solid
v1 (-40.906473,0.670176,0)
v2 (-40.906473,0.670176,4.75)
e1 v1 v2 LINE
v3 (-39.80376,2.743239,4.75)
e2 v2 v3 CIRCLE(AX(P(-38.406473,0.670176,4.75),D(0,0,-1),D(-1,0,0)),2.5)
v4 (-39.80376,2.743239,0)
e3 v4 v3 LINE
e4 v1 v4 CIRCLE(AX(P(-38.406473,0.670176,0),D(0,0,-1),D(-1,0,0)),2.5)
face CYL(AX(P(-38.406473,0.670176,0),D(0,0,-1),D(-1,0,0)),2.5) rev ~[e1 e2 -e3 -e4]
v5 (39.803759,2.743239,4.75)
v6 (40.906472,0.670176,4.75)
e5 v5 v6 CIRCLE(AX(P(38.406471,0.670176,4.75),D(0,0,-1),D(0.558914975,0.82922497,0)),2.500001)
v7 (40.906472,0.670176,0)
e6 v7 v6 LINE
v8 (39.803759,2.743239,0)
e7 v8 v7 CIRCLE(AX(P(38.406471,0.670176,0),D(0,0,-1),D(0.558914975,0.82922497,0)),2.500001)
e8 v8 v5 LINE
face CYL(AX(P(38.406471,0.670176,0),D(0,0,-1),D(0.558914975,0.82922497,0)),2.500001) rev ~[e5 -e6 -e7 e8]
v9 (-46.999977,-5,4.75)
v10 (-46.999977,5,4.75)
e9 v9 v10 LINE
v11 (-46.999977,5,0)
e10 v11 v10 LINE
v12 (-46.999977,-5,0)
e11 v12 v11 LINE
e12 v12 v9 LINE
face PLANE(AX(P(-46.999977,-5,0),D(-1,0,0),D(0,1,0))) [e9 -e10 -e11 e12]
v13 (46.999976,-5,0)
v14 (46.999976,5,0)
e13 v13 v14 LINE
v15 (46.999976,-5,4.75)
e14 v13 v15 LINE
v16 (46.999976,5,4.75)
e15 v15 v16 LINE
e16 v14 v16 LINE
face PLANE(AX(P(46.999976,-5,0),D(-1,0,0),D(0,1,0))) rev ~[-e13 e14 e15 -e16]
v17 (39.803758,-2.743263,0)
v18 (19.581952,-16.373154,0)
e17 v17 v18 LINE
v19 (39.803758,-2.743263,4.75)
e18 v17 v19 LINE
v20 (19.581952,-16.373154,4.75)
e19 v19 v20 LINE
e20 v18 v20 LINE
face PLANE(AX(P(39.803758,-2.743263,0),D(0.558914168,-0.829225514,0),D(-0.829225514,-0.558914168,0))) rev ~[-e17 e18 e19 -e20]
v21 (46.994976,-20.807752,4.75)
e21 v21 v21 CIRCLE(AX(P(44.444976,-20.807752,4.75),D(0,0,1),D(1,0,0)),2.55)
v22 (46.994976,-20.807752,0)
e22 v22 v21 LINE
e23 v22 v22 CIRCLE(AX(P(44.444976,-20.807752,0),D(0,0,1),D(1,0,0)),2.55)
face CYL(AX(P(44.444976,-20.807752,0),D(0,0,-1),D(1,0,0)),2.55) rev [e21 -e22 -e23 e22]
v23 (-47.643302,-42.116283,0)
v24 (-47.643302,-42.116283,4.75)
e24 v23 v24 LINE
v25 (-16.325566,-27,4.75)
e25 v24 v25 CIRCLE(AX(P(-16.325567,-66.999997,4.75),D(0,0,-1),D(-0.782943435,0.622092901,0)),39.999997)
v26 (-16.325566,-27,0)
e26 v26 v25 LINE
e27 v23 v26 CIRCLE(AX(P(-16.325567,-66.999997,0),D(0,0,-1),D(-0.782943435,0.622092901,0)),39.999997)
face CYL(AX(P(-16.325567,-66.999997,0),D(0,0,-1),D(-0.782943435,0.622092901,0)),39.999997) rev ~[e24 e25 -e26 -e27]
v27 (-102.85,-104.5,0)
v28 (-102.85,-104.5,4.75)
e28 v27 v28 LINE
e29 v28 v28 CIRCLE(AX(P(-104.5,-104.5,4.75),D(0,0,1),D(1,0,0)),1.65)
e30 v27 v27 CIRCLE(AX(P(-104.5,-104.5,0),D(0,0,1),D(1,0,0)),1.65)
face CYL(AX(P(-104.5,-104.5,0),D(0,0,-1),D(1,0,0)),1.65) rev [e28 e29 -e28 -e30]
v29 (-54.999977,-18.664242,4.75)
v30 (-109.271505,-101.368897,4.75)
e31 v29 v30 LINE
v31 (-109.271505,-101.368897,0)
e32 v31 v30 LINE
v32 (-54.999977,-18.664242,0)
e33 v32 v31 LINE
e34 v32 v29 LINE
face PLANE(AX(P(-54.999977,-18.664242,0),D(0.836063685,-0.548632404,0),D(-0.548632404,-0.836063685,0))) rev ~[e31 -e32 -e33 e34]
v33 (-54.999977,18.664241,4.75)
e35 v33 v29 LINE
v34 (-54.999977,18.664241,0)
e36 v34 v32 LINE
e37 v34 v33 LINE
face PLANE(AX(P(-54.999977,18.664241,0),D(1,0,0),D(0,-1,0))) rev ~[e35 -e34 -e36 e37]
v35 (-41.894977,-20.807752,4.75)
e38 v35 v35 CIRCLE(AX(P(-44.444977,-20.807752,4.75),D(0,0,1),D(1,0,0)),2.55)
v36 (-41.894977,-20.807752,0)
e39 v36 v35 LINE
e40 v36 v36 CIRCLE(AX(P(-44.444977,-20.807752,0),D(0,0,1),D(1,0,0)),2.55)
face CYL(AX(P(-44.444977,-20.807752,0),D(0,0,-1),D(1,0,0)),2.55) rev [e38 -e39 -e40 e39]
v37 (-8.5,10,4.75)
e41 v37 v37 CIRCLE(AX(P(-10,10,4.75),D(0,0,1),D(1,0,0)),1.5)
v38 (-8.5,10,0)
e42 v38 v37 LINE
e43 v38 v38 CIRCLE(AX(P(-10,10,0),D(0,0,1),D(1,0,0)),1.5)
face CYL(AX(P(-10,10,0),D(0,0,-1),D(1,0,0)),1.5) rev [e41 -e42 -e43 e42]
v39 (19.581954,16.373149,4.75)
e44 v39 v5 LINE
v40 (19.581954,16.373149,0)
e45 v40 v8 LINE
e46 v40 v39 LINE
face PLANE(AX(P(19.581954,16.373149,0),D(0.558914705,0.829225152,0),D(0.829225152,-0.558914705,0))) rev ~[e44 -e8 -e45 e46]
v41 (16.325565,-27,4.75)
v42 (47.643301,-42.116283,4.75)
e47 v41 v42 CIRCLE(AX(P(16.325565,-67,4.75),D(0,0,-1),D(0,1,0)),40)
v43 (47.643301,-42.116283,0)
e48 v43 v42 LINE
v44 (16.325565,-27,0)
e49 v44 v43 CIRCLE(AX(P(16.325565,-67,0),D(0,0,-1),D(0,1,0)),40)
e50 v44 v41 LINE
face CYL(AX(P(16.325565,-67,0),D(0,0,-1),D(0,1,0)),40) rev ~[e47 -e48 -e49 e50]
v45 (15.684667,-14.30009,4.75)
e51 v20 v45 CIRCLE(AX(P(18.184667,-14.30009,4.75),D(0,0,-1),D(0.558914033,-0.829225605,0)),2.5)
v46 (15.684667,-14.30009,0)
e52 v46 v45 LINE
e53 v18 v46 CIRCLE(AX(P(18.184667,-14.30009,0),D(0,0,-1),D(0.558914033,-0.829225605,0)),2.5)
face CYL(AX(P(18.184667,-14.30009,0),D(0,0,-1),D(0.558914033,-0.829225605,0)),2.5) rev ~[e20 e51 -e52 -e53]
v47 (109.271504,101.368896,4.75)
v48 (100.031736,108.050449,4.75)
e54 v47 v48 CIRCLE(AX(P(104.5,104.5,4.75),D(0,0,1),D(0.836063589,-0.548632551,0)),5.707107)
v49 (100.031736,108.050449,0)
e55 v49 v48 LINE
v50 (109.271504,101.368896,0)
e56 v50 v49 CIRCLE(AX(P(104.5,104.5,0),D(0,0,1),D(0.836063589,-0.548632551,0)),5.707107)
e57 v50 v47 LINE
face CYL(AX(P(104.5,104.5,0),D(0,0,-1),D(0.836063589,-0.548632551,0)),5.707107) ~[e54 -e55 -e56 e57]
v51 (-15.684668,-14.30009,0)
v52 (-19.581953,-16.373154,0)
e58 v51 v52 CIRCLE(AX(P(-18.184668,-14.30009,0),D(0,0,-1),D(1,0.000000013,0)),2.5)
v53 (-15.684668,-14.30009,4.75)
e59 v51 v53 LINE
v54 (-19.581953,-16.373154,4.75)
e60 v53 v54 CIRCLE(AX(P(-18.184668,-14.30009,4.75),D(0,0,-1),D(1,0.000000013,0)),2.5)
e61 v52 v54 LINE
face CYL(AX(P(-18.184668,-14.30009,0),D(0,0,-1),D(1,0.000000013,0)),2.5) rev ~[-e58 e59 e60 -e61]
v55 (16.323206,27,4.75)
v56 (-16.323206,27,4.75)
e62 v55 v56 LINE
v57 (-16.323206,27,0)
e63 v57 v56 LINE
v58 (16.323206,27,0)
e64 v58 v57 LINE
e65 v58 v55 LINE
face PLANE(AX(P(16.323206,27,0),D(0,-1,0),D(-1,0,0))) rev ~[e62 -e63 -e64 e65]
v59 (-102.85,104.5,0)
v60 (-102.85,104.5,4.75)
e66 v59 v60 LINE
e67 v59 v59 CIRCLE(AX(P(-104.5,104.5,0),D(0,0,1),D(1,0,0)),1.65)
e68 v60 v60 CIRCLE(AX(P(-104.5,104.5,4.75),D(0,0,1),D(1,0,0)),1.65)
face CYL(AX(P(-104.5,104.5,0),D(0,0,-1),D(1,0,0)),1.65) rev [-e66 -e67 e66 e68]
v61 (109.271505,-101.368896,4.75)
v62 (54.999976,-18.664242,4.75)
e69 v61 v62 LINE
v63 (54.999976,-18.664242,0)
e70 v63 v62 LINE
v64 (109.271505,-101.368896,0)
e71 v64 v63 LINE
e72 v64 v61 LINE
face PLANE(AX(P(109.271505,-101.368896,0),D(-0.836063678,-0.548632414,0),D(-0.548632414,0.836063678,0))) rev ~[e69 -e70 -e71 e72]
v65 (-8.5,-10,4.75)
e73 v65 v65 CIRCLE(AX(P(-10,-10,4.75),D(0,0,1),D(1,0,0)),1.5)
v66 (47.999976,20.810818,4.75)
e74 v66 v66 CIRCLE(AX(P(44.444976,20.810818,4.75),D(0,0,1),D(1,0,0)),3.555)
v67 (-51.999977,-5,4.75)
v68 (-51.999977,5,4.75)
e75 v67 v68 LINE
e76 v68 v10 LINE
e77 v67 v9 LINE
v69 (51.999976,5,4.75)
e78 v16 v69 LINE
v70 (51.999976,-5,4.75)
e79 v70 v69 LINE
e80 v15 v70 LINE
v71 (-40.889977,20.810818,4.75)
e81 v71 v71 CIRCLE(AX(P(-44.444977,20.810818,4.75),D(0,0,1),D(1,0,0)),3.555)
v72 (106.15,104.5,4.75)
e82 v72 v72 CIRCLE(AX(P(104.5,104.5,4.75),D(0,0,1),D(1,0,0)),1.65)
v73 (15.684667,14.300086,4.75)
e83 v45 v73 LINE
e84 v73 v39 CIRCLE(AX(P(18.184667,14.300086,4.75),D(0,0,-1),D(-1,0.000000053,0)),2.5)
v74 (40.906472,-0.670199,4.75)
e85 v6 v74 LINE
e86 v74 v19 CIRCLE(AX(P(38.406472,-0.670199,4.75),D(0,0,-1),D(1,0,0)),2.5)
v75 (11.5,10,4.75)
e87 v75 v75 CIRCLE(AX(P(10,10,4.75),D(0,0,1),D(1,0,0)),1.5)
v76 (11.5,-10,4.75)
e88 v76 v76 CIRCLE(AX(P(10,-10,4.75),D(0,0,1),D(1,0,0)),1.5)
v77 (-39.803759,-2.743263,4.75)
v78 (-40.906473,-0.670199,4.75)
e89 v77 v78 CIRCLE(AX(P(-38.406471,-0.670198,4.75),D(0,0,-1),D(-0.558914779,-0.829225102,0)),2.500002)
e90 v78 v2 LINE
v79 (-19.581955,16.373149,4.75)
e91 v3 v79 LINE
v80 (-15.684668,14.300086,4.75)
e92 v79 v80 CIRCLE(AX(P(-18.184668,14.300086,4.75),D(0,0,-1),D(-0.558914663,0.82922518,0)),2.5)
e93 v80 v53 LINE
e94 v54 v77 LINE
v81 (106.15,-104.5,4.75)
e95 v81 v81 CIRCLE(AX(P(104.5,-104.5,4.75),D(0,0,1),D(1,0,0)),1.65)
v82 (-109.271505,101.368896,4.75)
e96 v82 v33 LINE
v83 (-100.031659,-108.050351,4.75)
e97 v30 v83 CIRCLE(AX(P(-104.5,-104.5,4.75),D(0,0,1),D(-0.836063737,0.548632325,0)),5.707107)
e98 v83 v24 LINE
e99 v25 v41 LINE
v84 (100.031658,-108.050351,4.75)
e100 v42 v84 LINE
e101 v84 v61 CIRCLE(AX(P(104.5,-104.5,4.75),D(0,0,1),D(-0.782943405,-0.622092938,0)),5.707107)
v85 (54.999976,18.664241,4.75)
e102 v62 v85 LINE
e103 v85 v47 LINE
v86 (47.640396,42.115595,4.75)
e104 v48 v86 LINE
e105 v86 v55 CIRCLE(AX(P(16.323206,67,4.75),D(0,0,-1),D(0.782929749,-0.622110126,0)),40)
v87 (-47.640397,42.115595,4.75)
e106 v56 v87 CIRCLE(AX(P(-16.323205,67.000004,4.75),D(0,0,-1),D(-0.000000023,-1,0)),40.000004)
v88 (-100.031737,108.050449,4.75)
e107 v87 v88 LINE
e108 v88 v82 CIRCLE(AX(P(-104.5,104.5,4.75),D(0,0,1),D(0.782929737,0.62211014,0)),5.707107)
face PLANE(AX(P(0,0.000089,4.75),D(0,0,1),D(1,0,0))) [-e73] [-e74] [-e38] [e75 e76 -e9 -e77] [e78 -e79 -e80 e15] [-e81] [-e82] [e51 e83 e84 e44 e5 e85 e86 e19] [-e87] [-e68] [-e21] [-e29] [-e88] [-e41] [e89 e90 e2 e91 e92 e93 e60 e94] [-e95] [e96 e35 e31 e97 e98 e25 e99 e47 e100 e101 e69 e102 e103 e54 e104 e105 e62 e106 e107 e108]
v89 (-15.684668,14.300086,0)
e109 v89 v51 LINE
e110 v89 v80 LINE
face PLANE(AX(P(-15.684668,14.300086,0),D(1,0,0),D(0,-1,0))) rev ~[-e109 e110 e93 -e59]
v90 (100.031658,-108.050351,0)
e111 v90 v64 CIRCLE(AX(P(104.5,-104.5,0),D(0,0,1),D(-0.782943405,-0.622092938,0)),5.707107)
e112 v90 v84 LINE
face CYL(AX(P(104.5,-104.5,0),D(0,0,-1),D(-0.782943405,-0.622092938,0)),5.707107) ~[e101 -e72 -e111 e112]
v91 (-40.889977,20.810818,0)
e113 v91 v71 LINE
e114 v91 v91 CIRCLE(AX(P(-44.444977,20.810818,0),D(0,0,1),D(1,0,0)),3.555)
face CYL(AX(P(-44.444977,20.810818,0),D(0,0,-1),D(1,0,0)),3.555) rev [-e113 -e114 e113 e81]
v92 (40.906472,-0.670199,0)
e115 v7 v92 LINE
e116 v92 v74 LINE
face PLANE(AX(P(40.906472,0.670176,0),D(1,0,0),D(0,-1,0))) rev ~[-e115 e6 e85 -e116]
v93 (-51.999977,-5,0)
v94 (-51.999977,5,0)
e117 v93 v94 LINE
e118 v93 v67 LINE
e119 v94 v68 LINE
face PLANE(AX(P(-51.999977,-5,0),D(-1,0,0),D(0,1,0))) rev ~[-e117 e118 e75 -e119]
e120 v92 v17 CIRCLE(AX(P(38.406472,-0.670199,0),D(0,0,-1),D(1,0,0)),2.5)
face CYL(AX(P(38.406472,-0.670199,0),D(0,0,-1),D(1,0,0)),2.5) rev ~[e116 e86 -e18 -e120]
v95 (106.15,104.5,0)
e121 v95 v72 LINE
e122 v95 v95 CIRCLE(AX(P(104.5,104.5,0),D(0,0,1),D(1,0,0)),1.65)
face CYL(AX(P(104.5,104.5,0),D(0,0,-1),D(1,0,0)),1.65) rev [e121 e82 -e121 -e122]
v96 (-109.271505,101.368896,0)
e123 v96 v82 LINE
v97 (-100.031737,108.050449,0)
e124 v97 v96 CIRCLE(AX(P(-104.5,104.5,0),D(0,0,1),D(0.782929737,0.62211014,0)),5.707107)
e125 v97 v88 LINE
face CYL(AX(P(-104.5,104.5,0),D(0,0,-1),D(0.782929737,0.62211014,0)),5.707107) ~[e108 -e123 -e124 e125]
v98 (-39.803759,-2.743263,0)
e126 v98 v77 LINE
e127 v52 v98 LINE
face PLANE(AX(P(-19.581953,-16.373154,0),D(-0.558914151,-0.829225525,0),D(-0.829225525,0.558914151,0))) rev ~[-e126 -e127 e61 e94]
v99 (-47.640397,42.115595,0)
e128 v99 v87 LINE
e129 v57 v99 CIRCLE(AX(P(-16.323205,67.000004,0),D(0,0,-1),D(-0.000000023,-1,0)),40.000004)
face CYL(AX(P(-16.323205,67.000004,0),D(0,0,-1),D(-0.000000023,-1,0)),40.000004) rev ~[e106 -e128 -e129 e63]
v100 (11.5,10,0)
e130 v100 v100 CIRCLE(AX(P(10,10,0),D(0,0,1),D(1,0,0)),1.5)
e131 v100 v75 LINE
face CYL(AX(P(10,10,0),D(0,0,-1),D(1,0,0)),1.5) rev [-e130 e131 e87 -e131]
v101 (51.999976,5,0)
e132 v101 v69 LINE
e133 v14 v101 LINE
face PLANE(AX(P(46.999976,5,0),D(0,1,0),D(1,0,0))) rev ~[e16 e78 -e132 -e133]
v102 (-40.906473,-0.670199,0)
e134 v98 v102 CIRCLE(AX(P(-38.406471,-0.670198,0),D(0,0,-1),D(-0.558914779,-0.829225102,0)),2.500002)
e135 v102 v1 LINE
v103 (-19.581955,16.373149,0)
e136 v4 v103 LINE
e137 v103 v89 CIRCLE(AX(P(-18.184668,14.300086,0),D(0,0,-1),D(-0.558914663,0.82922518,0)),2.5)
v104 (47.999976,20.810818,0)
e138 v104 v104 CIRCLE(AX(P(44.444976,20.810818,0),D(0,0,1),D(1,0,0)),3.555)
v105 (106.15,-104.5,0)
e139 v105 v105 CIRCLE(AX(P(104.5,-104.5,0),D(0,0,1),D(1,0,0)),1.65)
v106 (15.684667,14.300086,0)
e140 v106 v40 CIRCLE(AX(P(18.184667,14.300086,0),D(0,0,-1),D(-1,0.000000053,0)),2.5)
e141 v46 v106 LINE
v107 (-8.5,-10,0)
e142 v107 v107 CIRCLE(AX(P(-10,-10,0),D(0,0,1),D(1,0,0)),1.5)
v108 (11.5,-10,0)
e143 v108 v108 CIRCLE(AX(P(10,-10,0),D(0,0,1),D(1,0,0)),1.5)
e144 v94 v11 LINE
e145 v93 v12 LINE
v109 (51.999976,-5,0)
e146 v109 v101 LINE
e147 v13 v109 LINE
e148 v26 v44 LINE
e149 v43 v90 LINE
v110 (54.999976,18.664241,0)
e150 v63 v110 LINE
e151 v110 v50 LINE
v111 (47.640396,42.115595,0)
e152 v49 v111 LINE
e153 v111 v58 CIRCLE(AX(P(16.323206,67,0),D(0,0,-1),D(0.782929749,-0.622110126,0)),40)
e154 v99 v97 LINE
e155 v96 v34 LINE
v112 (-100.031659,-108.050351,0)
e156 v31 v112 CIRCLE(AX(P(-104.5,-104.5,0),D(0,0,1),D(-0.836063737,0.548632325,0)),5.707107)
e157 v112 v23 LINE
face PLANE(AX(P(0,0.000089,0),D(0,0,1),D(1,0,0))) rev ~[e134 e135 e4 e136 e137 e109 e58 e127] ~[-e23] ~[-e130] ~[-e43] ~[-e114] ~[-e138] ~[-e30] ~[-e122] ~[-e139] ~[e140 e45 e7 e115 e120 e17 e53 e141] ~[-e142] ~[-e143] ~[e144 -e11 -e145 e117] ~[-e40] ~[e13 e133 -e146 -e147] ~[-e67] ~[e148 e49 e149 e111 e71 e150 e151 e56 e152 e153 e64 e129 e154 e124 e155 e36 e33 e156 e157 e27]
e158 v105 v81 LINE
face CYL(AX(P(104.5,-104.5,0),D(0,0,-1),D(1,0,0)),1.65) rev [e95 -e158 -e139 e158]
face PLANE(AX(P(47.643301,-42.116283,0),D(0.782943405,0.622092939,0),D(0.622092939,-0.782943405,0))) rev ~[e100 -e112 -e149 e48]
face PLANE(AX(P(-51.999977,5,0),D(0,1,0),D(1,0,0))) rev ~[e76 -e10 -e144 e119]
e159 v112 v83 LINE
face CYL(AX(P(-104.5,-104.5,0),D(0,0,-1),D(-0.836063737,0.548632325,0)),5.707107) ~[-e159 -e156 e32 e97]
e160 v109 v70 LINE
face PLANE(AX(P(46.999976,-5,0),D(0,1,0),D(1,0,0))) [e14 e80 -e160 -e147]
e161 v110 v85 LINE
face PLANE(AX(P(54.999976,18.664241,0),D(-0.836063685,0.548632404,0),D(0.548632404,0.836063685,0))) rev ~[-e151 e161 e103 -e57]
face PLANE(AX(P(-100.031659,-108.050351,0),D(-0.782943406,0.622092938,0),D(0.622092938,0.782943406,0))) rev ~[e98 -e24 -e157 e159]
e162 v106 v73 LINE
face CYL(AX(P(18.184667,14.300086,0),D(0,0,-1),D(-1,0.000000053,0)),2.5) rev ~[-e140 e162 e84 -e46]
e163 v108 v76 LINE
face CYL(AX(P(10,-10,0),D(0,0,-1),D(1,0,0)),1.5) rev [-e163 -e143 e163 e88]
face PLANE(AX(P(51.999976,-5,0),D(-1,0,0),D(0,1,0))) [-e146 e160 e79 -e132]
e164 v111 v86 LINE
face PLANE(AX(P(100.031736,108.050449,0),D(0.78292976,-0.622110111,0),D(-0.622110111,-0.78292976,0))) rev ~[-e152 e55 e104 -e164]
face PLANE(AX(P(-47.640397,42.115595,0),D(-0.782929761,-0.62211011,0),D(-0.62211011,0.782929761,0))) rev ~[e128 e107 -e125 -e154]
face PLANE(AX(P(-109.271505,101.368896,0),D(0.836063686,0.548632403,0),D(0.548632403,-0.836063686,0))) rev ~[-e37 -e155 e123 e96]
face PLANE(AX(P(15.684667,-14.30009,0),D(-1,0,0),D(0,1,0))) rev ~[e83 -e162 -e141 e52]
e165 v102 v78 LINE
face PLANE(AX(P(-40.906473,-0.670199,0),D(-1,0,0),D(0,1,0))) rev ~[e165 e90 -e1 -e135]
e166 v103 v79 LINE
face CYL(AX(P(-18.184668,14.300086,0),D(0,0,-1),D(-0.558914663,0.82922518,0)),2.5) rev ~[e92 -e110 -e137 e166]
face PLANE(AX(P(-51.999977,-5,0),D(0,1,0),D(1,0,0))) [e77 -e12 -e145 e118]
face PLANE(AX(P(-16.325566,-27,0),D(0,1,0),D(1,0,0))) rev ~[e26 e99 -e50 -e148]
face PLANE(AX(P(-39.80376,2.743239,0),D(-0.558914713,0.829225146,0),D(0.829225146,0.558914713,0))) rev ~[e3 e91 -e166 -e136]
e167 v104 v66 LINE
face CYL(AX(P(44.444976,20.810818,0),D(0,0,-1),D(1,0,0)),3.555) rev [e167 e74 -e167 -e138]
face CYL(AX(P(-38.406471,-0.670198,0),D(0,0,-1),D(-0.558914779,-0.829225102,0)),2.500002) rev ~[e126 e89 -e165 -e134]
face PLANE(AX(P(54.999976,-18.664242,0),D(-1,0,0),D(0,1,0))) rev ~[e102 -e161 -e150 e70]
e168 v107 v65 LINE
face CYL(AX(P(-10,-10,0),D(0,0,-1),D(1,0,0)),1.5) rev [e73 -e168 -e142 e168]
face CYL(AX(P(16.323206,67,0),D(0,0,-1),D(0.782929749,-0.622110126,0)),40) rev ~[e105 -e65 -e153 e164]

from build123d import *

# Parameters (mm, degrees)
F0_R     = 1.65
F0_R_2   = 2.55
F0_W     = 5
F0_H     = 10
F0_R_3   = 1.5
F0_R_4   = 3.555
F1_DEPTH = 4.75


# Not quite as in the source:
# - ends of sketch curves that miss each other by under 0.0002 mm in the source are joined


with BuildPart() as f1:
    # F0 (on Top) → F1 (new body)
    with BuildSketch(Plane.XY):
        with BuildLine():
            Line((-47.640397, 42.115595), (-100.031737, 108.050449))
            ThreePointArc((-100.031737, 108.050449), (-107.8442155419, 109.1246397394), (-109.2715048598, 101.368896092))
            Line((-109.2715048598, 101.368896092), (-54.999977, 18.664241))
            Line((-54.999977, 18.664241), (-54.999977, -18.664242))
            Line((-54.999977, -18.664242), (-109.271505, -101.368897))
            ThreePointArc((-109.271505, -101.368897), (-107.8441644553, -109.1246766812), (-100.031658534, -108.0503513703))
            Line((-100.031658534, -108.0503513703), (-47.643302, -42.116283))
            ThreePointArc((-47.643302, -42.116283), (-33.7130803066, -30.9767526972), (-16.325566, -27))
            Line((-16.325566, -27), (16.325565, -27))
            ThreePointArc((16.325565, -27), (33.7130793066, -30.9767526972), (47.6433013924, -42.1162826882))
            Line((47.6433013924, -42.1162826882), (100.031658, -108.050351))
            ThreePointArc((100.031658, -108.050351), (107.8441644255, -109.1246767027), (109.2715050175, -101.3688963323))
            Line((109.2715050175, -101.3688963323), (54.999976, -18.664242))
            Line((54.999976, -18.664242), (54.999976, 18.664241))
            Line((54.999976, 18.664241), (109.271504, 101.368896))
            ThreePointArc((109.271504, 101.368896), (107.8442155121, 109.1246397609), (100.0317360662, 108.0504489474))
            Line((100.0317360662, 108.0504489474), (47.640396, 42.115595))
            ThreePointArc((47.640396, 42.115595), (33.7103248028, 30.9765618002), (16.323206, 27))
            Line((16.323206, 27), (-16.323206, 27))
            ThreePointArc((-16.323206, 27), (-33.710325083, 30.9765619354), (-47.640397, 42.115595))
        make_face()
        with Locations((-104.5, -104.5)):
            Circle(F0_R, mode=Mode.SUBTRACT)
        with Locations((-44.444977, -20.807752)):
            Circle(F0_R_2, mode=Mode.SUBTRACT)
        with Locations((-49.499977, 0)):
            Rectangle(F0_W, F0_H, mode=Mode.SUBTRACT)
        with BuildLine():
            Line((-19.581953, -16.373154), (-39.803759, -2.743263))
            ThreePointArc((-39.803759, -2.743263), (-40.6136447533, -1.8442487652), (-40.906473, -0.670199))
            Line((-40.906473, -0.670199), (-40.906473, 0.670176))
            ThreePointArc((-40.906473, 0.670176), (-40.6136450793, 1.8442251525), (-39.8037598701, 2.7432388072))
            Line((-39.8037598701, 2.7432388072), (-19.581955, 16.373149))
            ThreePointArc((-19.581955, 16.373149), (-17.0106188475, 16.5072580793), (-15.684668, 14.300086))
            Line((-15.684668, 14.300086), (-15.684668, -14.30009))
            ThreePointArc((-15.684668, -14.30009), (-17.0106178687, -16.5072615586), (-19.581953, -16.373154))
        make_face(mode=Mode.SUBTRACT)
        with Locations((-10, -10)):
            Circle(F0_R_3, mode=Mode.SUBTRACT)
        with Locations((104.5, -104.5)):
            Circle(F0_R, mode=Mode.SUBTRACT)
        with Locations((10, -10)):
            Circle(F0_R_3, mode=Mode.SUBTRACT)
        with Locations((44.444976, -20.807752)):
            Circle(F0_R_2, mode=Mode.SUBTRACT)
        with BuildLine():
            Line((19.581954, 16.373149), (39.803759, 2.743239))
            ThreePointArc((39.803759, 2.743239), (40.6136440793, 1.8442251525), (40.906472, 0.670176))
            Line((40.906472, 0.670176), (40.906472, -0.670199))
            ThreePointArc((40.906472, -0.670199), (40.6136437533, -1.8442487652), (39.803757719, -2.7432625831))
            Line((39.803757719, -2.7432625831), (19.581952, -16.373154))
            ThreePointArc((19.581952, -16.373154), (17.0106168687, -16.5072615586), (15.684667, -14.30009))
            Line((15.684667, -14.30009), (15.684667, 14.300086))
            ThreePointArc((15.684667, 14.300086), (17.0106178475, 16.5072580793), (19.581954, 16.373149))
        make_face(mode=Mode.SUBTRACT)
        with Locations((49.499976, 0)):
            Rectangle(F0_W, F0_H, mode=Mode.SUBTRACT)
        with Locations((-44.444977, 20.810818)):
            Circle(F0_R_4, mode=Mode.SUBTRACT)
        with Locations((-10, 10)):
            Circle(F0_R_3, mode=Mode.SUBTRACT)
        with Locations((-104.5, 104.5)):
            Circle(F0_R, mode=Mode.SUBTRACT)
        with Locations((10, 10)):
            Circle(F0_R_3, mode=Mode.SUBTRACT)
        with Locations((44.444976, 20.810818)):
            Circle(F0_R_4, mode=Mode.SUBTRACT)
        with Locations((104.5, 104.5)):
            Circle(F0_R, mode=Mode.SUBTRACT)
    extrude(amount=F1_DEPTH)


solid = f1.part
